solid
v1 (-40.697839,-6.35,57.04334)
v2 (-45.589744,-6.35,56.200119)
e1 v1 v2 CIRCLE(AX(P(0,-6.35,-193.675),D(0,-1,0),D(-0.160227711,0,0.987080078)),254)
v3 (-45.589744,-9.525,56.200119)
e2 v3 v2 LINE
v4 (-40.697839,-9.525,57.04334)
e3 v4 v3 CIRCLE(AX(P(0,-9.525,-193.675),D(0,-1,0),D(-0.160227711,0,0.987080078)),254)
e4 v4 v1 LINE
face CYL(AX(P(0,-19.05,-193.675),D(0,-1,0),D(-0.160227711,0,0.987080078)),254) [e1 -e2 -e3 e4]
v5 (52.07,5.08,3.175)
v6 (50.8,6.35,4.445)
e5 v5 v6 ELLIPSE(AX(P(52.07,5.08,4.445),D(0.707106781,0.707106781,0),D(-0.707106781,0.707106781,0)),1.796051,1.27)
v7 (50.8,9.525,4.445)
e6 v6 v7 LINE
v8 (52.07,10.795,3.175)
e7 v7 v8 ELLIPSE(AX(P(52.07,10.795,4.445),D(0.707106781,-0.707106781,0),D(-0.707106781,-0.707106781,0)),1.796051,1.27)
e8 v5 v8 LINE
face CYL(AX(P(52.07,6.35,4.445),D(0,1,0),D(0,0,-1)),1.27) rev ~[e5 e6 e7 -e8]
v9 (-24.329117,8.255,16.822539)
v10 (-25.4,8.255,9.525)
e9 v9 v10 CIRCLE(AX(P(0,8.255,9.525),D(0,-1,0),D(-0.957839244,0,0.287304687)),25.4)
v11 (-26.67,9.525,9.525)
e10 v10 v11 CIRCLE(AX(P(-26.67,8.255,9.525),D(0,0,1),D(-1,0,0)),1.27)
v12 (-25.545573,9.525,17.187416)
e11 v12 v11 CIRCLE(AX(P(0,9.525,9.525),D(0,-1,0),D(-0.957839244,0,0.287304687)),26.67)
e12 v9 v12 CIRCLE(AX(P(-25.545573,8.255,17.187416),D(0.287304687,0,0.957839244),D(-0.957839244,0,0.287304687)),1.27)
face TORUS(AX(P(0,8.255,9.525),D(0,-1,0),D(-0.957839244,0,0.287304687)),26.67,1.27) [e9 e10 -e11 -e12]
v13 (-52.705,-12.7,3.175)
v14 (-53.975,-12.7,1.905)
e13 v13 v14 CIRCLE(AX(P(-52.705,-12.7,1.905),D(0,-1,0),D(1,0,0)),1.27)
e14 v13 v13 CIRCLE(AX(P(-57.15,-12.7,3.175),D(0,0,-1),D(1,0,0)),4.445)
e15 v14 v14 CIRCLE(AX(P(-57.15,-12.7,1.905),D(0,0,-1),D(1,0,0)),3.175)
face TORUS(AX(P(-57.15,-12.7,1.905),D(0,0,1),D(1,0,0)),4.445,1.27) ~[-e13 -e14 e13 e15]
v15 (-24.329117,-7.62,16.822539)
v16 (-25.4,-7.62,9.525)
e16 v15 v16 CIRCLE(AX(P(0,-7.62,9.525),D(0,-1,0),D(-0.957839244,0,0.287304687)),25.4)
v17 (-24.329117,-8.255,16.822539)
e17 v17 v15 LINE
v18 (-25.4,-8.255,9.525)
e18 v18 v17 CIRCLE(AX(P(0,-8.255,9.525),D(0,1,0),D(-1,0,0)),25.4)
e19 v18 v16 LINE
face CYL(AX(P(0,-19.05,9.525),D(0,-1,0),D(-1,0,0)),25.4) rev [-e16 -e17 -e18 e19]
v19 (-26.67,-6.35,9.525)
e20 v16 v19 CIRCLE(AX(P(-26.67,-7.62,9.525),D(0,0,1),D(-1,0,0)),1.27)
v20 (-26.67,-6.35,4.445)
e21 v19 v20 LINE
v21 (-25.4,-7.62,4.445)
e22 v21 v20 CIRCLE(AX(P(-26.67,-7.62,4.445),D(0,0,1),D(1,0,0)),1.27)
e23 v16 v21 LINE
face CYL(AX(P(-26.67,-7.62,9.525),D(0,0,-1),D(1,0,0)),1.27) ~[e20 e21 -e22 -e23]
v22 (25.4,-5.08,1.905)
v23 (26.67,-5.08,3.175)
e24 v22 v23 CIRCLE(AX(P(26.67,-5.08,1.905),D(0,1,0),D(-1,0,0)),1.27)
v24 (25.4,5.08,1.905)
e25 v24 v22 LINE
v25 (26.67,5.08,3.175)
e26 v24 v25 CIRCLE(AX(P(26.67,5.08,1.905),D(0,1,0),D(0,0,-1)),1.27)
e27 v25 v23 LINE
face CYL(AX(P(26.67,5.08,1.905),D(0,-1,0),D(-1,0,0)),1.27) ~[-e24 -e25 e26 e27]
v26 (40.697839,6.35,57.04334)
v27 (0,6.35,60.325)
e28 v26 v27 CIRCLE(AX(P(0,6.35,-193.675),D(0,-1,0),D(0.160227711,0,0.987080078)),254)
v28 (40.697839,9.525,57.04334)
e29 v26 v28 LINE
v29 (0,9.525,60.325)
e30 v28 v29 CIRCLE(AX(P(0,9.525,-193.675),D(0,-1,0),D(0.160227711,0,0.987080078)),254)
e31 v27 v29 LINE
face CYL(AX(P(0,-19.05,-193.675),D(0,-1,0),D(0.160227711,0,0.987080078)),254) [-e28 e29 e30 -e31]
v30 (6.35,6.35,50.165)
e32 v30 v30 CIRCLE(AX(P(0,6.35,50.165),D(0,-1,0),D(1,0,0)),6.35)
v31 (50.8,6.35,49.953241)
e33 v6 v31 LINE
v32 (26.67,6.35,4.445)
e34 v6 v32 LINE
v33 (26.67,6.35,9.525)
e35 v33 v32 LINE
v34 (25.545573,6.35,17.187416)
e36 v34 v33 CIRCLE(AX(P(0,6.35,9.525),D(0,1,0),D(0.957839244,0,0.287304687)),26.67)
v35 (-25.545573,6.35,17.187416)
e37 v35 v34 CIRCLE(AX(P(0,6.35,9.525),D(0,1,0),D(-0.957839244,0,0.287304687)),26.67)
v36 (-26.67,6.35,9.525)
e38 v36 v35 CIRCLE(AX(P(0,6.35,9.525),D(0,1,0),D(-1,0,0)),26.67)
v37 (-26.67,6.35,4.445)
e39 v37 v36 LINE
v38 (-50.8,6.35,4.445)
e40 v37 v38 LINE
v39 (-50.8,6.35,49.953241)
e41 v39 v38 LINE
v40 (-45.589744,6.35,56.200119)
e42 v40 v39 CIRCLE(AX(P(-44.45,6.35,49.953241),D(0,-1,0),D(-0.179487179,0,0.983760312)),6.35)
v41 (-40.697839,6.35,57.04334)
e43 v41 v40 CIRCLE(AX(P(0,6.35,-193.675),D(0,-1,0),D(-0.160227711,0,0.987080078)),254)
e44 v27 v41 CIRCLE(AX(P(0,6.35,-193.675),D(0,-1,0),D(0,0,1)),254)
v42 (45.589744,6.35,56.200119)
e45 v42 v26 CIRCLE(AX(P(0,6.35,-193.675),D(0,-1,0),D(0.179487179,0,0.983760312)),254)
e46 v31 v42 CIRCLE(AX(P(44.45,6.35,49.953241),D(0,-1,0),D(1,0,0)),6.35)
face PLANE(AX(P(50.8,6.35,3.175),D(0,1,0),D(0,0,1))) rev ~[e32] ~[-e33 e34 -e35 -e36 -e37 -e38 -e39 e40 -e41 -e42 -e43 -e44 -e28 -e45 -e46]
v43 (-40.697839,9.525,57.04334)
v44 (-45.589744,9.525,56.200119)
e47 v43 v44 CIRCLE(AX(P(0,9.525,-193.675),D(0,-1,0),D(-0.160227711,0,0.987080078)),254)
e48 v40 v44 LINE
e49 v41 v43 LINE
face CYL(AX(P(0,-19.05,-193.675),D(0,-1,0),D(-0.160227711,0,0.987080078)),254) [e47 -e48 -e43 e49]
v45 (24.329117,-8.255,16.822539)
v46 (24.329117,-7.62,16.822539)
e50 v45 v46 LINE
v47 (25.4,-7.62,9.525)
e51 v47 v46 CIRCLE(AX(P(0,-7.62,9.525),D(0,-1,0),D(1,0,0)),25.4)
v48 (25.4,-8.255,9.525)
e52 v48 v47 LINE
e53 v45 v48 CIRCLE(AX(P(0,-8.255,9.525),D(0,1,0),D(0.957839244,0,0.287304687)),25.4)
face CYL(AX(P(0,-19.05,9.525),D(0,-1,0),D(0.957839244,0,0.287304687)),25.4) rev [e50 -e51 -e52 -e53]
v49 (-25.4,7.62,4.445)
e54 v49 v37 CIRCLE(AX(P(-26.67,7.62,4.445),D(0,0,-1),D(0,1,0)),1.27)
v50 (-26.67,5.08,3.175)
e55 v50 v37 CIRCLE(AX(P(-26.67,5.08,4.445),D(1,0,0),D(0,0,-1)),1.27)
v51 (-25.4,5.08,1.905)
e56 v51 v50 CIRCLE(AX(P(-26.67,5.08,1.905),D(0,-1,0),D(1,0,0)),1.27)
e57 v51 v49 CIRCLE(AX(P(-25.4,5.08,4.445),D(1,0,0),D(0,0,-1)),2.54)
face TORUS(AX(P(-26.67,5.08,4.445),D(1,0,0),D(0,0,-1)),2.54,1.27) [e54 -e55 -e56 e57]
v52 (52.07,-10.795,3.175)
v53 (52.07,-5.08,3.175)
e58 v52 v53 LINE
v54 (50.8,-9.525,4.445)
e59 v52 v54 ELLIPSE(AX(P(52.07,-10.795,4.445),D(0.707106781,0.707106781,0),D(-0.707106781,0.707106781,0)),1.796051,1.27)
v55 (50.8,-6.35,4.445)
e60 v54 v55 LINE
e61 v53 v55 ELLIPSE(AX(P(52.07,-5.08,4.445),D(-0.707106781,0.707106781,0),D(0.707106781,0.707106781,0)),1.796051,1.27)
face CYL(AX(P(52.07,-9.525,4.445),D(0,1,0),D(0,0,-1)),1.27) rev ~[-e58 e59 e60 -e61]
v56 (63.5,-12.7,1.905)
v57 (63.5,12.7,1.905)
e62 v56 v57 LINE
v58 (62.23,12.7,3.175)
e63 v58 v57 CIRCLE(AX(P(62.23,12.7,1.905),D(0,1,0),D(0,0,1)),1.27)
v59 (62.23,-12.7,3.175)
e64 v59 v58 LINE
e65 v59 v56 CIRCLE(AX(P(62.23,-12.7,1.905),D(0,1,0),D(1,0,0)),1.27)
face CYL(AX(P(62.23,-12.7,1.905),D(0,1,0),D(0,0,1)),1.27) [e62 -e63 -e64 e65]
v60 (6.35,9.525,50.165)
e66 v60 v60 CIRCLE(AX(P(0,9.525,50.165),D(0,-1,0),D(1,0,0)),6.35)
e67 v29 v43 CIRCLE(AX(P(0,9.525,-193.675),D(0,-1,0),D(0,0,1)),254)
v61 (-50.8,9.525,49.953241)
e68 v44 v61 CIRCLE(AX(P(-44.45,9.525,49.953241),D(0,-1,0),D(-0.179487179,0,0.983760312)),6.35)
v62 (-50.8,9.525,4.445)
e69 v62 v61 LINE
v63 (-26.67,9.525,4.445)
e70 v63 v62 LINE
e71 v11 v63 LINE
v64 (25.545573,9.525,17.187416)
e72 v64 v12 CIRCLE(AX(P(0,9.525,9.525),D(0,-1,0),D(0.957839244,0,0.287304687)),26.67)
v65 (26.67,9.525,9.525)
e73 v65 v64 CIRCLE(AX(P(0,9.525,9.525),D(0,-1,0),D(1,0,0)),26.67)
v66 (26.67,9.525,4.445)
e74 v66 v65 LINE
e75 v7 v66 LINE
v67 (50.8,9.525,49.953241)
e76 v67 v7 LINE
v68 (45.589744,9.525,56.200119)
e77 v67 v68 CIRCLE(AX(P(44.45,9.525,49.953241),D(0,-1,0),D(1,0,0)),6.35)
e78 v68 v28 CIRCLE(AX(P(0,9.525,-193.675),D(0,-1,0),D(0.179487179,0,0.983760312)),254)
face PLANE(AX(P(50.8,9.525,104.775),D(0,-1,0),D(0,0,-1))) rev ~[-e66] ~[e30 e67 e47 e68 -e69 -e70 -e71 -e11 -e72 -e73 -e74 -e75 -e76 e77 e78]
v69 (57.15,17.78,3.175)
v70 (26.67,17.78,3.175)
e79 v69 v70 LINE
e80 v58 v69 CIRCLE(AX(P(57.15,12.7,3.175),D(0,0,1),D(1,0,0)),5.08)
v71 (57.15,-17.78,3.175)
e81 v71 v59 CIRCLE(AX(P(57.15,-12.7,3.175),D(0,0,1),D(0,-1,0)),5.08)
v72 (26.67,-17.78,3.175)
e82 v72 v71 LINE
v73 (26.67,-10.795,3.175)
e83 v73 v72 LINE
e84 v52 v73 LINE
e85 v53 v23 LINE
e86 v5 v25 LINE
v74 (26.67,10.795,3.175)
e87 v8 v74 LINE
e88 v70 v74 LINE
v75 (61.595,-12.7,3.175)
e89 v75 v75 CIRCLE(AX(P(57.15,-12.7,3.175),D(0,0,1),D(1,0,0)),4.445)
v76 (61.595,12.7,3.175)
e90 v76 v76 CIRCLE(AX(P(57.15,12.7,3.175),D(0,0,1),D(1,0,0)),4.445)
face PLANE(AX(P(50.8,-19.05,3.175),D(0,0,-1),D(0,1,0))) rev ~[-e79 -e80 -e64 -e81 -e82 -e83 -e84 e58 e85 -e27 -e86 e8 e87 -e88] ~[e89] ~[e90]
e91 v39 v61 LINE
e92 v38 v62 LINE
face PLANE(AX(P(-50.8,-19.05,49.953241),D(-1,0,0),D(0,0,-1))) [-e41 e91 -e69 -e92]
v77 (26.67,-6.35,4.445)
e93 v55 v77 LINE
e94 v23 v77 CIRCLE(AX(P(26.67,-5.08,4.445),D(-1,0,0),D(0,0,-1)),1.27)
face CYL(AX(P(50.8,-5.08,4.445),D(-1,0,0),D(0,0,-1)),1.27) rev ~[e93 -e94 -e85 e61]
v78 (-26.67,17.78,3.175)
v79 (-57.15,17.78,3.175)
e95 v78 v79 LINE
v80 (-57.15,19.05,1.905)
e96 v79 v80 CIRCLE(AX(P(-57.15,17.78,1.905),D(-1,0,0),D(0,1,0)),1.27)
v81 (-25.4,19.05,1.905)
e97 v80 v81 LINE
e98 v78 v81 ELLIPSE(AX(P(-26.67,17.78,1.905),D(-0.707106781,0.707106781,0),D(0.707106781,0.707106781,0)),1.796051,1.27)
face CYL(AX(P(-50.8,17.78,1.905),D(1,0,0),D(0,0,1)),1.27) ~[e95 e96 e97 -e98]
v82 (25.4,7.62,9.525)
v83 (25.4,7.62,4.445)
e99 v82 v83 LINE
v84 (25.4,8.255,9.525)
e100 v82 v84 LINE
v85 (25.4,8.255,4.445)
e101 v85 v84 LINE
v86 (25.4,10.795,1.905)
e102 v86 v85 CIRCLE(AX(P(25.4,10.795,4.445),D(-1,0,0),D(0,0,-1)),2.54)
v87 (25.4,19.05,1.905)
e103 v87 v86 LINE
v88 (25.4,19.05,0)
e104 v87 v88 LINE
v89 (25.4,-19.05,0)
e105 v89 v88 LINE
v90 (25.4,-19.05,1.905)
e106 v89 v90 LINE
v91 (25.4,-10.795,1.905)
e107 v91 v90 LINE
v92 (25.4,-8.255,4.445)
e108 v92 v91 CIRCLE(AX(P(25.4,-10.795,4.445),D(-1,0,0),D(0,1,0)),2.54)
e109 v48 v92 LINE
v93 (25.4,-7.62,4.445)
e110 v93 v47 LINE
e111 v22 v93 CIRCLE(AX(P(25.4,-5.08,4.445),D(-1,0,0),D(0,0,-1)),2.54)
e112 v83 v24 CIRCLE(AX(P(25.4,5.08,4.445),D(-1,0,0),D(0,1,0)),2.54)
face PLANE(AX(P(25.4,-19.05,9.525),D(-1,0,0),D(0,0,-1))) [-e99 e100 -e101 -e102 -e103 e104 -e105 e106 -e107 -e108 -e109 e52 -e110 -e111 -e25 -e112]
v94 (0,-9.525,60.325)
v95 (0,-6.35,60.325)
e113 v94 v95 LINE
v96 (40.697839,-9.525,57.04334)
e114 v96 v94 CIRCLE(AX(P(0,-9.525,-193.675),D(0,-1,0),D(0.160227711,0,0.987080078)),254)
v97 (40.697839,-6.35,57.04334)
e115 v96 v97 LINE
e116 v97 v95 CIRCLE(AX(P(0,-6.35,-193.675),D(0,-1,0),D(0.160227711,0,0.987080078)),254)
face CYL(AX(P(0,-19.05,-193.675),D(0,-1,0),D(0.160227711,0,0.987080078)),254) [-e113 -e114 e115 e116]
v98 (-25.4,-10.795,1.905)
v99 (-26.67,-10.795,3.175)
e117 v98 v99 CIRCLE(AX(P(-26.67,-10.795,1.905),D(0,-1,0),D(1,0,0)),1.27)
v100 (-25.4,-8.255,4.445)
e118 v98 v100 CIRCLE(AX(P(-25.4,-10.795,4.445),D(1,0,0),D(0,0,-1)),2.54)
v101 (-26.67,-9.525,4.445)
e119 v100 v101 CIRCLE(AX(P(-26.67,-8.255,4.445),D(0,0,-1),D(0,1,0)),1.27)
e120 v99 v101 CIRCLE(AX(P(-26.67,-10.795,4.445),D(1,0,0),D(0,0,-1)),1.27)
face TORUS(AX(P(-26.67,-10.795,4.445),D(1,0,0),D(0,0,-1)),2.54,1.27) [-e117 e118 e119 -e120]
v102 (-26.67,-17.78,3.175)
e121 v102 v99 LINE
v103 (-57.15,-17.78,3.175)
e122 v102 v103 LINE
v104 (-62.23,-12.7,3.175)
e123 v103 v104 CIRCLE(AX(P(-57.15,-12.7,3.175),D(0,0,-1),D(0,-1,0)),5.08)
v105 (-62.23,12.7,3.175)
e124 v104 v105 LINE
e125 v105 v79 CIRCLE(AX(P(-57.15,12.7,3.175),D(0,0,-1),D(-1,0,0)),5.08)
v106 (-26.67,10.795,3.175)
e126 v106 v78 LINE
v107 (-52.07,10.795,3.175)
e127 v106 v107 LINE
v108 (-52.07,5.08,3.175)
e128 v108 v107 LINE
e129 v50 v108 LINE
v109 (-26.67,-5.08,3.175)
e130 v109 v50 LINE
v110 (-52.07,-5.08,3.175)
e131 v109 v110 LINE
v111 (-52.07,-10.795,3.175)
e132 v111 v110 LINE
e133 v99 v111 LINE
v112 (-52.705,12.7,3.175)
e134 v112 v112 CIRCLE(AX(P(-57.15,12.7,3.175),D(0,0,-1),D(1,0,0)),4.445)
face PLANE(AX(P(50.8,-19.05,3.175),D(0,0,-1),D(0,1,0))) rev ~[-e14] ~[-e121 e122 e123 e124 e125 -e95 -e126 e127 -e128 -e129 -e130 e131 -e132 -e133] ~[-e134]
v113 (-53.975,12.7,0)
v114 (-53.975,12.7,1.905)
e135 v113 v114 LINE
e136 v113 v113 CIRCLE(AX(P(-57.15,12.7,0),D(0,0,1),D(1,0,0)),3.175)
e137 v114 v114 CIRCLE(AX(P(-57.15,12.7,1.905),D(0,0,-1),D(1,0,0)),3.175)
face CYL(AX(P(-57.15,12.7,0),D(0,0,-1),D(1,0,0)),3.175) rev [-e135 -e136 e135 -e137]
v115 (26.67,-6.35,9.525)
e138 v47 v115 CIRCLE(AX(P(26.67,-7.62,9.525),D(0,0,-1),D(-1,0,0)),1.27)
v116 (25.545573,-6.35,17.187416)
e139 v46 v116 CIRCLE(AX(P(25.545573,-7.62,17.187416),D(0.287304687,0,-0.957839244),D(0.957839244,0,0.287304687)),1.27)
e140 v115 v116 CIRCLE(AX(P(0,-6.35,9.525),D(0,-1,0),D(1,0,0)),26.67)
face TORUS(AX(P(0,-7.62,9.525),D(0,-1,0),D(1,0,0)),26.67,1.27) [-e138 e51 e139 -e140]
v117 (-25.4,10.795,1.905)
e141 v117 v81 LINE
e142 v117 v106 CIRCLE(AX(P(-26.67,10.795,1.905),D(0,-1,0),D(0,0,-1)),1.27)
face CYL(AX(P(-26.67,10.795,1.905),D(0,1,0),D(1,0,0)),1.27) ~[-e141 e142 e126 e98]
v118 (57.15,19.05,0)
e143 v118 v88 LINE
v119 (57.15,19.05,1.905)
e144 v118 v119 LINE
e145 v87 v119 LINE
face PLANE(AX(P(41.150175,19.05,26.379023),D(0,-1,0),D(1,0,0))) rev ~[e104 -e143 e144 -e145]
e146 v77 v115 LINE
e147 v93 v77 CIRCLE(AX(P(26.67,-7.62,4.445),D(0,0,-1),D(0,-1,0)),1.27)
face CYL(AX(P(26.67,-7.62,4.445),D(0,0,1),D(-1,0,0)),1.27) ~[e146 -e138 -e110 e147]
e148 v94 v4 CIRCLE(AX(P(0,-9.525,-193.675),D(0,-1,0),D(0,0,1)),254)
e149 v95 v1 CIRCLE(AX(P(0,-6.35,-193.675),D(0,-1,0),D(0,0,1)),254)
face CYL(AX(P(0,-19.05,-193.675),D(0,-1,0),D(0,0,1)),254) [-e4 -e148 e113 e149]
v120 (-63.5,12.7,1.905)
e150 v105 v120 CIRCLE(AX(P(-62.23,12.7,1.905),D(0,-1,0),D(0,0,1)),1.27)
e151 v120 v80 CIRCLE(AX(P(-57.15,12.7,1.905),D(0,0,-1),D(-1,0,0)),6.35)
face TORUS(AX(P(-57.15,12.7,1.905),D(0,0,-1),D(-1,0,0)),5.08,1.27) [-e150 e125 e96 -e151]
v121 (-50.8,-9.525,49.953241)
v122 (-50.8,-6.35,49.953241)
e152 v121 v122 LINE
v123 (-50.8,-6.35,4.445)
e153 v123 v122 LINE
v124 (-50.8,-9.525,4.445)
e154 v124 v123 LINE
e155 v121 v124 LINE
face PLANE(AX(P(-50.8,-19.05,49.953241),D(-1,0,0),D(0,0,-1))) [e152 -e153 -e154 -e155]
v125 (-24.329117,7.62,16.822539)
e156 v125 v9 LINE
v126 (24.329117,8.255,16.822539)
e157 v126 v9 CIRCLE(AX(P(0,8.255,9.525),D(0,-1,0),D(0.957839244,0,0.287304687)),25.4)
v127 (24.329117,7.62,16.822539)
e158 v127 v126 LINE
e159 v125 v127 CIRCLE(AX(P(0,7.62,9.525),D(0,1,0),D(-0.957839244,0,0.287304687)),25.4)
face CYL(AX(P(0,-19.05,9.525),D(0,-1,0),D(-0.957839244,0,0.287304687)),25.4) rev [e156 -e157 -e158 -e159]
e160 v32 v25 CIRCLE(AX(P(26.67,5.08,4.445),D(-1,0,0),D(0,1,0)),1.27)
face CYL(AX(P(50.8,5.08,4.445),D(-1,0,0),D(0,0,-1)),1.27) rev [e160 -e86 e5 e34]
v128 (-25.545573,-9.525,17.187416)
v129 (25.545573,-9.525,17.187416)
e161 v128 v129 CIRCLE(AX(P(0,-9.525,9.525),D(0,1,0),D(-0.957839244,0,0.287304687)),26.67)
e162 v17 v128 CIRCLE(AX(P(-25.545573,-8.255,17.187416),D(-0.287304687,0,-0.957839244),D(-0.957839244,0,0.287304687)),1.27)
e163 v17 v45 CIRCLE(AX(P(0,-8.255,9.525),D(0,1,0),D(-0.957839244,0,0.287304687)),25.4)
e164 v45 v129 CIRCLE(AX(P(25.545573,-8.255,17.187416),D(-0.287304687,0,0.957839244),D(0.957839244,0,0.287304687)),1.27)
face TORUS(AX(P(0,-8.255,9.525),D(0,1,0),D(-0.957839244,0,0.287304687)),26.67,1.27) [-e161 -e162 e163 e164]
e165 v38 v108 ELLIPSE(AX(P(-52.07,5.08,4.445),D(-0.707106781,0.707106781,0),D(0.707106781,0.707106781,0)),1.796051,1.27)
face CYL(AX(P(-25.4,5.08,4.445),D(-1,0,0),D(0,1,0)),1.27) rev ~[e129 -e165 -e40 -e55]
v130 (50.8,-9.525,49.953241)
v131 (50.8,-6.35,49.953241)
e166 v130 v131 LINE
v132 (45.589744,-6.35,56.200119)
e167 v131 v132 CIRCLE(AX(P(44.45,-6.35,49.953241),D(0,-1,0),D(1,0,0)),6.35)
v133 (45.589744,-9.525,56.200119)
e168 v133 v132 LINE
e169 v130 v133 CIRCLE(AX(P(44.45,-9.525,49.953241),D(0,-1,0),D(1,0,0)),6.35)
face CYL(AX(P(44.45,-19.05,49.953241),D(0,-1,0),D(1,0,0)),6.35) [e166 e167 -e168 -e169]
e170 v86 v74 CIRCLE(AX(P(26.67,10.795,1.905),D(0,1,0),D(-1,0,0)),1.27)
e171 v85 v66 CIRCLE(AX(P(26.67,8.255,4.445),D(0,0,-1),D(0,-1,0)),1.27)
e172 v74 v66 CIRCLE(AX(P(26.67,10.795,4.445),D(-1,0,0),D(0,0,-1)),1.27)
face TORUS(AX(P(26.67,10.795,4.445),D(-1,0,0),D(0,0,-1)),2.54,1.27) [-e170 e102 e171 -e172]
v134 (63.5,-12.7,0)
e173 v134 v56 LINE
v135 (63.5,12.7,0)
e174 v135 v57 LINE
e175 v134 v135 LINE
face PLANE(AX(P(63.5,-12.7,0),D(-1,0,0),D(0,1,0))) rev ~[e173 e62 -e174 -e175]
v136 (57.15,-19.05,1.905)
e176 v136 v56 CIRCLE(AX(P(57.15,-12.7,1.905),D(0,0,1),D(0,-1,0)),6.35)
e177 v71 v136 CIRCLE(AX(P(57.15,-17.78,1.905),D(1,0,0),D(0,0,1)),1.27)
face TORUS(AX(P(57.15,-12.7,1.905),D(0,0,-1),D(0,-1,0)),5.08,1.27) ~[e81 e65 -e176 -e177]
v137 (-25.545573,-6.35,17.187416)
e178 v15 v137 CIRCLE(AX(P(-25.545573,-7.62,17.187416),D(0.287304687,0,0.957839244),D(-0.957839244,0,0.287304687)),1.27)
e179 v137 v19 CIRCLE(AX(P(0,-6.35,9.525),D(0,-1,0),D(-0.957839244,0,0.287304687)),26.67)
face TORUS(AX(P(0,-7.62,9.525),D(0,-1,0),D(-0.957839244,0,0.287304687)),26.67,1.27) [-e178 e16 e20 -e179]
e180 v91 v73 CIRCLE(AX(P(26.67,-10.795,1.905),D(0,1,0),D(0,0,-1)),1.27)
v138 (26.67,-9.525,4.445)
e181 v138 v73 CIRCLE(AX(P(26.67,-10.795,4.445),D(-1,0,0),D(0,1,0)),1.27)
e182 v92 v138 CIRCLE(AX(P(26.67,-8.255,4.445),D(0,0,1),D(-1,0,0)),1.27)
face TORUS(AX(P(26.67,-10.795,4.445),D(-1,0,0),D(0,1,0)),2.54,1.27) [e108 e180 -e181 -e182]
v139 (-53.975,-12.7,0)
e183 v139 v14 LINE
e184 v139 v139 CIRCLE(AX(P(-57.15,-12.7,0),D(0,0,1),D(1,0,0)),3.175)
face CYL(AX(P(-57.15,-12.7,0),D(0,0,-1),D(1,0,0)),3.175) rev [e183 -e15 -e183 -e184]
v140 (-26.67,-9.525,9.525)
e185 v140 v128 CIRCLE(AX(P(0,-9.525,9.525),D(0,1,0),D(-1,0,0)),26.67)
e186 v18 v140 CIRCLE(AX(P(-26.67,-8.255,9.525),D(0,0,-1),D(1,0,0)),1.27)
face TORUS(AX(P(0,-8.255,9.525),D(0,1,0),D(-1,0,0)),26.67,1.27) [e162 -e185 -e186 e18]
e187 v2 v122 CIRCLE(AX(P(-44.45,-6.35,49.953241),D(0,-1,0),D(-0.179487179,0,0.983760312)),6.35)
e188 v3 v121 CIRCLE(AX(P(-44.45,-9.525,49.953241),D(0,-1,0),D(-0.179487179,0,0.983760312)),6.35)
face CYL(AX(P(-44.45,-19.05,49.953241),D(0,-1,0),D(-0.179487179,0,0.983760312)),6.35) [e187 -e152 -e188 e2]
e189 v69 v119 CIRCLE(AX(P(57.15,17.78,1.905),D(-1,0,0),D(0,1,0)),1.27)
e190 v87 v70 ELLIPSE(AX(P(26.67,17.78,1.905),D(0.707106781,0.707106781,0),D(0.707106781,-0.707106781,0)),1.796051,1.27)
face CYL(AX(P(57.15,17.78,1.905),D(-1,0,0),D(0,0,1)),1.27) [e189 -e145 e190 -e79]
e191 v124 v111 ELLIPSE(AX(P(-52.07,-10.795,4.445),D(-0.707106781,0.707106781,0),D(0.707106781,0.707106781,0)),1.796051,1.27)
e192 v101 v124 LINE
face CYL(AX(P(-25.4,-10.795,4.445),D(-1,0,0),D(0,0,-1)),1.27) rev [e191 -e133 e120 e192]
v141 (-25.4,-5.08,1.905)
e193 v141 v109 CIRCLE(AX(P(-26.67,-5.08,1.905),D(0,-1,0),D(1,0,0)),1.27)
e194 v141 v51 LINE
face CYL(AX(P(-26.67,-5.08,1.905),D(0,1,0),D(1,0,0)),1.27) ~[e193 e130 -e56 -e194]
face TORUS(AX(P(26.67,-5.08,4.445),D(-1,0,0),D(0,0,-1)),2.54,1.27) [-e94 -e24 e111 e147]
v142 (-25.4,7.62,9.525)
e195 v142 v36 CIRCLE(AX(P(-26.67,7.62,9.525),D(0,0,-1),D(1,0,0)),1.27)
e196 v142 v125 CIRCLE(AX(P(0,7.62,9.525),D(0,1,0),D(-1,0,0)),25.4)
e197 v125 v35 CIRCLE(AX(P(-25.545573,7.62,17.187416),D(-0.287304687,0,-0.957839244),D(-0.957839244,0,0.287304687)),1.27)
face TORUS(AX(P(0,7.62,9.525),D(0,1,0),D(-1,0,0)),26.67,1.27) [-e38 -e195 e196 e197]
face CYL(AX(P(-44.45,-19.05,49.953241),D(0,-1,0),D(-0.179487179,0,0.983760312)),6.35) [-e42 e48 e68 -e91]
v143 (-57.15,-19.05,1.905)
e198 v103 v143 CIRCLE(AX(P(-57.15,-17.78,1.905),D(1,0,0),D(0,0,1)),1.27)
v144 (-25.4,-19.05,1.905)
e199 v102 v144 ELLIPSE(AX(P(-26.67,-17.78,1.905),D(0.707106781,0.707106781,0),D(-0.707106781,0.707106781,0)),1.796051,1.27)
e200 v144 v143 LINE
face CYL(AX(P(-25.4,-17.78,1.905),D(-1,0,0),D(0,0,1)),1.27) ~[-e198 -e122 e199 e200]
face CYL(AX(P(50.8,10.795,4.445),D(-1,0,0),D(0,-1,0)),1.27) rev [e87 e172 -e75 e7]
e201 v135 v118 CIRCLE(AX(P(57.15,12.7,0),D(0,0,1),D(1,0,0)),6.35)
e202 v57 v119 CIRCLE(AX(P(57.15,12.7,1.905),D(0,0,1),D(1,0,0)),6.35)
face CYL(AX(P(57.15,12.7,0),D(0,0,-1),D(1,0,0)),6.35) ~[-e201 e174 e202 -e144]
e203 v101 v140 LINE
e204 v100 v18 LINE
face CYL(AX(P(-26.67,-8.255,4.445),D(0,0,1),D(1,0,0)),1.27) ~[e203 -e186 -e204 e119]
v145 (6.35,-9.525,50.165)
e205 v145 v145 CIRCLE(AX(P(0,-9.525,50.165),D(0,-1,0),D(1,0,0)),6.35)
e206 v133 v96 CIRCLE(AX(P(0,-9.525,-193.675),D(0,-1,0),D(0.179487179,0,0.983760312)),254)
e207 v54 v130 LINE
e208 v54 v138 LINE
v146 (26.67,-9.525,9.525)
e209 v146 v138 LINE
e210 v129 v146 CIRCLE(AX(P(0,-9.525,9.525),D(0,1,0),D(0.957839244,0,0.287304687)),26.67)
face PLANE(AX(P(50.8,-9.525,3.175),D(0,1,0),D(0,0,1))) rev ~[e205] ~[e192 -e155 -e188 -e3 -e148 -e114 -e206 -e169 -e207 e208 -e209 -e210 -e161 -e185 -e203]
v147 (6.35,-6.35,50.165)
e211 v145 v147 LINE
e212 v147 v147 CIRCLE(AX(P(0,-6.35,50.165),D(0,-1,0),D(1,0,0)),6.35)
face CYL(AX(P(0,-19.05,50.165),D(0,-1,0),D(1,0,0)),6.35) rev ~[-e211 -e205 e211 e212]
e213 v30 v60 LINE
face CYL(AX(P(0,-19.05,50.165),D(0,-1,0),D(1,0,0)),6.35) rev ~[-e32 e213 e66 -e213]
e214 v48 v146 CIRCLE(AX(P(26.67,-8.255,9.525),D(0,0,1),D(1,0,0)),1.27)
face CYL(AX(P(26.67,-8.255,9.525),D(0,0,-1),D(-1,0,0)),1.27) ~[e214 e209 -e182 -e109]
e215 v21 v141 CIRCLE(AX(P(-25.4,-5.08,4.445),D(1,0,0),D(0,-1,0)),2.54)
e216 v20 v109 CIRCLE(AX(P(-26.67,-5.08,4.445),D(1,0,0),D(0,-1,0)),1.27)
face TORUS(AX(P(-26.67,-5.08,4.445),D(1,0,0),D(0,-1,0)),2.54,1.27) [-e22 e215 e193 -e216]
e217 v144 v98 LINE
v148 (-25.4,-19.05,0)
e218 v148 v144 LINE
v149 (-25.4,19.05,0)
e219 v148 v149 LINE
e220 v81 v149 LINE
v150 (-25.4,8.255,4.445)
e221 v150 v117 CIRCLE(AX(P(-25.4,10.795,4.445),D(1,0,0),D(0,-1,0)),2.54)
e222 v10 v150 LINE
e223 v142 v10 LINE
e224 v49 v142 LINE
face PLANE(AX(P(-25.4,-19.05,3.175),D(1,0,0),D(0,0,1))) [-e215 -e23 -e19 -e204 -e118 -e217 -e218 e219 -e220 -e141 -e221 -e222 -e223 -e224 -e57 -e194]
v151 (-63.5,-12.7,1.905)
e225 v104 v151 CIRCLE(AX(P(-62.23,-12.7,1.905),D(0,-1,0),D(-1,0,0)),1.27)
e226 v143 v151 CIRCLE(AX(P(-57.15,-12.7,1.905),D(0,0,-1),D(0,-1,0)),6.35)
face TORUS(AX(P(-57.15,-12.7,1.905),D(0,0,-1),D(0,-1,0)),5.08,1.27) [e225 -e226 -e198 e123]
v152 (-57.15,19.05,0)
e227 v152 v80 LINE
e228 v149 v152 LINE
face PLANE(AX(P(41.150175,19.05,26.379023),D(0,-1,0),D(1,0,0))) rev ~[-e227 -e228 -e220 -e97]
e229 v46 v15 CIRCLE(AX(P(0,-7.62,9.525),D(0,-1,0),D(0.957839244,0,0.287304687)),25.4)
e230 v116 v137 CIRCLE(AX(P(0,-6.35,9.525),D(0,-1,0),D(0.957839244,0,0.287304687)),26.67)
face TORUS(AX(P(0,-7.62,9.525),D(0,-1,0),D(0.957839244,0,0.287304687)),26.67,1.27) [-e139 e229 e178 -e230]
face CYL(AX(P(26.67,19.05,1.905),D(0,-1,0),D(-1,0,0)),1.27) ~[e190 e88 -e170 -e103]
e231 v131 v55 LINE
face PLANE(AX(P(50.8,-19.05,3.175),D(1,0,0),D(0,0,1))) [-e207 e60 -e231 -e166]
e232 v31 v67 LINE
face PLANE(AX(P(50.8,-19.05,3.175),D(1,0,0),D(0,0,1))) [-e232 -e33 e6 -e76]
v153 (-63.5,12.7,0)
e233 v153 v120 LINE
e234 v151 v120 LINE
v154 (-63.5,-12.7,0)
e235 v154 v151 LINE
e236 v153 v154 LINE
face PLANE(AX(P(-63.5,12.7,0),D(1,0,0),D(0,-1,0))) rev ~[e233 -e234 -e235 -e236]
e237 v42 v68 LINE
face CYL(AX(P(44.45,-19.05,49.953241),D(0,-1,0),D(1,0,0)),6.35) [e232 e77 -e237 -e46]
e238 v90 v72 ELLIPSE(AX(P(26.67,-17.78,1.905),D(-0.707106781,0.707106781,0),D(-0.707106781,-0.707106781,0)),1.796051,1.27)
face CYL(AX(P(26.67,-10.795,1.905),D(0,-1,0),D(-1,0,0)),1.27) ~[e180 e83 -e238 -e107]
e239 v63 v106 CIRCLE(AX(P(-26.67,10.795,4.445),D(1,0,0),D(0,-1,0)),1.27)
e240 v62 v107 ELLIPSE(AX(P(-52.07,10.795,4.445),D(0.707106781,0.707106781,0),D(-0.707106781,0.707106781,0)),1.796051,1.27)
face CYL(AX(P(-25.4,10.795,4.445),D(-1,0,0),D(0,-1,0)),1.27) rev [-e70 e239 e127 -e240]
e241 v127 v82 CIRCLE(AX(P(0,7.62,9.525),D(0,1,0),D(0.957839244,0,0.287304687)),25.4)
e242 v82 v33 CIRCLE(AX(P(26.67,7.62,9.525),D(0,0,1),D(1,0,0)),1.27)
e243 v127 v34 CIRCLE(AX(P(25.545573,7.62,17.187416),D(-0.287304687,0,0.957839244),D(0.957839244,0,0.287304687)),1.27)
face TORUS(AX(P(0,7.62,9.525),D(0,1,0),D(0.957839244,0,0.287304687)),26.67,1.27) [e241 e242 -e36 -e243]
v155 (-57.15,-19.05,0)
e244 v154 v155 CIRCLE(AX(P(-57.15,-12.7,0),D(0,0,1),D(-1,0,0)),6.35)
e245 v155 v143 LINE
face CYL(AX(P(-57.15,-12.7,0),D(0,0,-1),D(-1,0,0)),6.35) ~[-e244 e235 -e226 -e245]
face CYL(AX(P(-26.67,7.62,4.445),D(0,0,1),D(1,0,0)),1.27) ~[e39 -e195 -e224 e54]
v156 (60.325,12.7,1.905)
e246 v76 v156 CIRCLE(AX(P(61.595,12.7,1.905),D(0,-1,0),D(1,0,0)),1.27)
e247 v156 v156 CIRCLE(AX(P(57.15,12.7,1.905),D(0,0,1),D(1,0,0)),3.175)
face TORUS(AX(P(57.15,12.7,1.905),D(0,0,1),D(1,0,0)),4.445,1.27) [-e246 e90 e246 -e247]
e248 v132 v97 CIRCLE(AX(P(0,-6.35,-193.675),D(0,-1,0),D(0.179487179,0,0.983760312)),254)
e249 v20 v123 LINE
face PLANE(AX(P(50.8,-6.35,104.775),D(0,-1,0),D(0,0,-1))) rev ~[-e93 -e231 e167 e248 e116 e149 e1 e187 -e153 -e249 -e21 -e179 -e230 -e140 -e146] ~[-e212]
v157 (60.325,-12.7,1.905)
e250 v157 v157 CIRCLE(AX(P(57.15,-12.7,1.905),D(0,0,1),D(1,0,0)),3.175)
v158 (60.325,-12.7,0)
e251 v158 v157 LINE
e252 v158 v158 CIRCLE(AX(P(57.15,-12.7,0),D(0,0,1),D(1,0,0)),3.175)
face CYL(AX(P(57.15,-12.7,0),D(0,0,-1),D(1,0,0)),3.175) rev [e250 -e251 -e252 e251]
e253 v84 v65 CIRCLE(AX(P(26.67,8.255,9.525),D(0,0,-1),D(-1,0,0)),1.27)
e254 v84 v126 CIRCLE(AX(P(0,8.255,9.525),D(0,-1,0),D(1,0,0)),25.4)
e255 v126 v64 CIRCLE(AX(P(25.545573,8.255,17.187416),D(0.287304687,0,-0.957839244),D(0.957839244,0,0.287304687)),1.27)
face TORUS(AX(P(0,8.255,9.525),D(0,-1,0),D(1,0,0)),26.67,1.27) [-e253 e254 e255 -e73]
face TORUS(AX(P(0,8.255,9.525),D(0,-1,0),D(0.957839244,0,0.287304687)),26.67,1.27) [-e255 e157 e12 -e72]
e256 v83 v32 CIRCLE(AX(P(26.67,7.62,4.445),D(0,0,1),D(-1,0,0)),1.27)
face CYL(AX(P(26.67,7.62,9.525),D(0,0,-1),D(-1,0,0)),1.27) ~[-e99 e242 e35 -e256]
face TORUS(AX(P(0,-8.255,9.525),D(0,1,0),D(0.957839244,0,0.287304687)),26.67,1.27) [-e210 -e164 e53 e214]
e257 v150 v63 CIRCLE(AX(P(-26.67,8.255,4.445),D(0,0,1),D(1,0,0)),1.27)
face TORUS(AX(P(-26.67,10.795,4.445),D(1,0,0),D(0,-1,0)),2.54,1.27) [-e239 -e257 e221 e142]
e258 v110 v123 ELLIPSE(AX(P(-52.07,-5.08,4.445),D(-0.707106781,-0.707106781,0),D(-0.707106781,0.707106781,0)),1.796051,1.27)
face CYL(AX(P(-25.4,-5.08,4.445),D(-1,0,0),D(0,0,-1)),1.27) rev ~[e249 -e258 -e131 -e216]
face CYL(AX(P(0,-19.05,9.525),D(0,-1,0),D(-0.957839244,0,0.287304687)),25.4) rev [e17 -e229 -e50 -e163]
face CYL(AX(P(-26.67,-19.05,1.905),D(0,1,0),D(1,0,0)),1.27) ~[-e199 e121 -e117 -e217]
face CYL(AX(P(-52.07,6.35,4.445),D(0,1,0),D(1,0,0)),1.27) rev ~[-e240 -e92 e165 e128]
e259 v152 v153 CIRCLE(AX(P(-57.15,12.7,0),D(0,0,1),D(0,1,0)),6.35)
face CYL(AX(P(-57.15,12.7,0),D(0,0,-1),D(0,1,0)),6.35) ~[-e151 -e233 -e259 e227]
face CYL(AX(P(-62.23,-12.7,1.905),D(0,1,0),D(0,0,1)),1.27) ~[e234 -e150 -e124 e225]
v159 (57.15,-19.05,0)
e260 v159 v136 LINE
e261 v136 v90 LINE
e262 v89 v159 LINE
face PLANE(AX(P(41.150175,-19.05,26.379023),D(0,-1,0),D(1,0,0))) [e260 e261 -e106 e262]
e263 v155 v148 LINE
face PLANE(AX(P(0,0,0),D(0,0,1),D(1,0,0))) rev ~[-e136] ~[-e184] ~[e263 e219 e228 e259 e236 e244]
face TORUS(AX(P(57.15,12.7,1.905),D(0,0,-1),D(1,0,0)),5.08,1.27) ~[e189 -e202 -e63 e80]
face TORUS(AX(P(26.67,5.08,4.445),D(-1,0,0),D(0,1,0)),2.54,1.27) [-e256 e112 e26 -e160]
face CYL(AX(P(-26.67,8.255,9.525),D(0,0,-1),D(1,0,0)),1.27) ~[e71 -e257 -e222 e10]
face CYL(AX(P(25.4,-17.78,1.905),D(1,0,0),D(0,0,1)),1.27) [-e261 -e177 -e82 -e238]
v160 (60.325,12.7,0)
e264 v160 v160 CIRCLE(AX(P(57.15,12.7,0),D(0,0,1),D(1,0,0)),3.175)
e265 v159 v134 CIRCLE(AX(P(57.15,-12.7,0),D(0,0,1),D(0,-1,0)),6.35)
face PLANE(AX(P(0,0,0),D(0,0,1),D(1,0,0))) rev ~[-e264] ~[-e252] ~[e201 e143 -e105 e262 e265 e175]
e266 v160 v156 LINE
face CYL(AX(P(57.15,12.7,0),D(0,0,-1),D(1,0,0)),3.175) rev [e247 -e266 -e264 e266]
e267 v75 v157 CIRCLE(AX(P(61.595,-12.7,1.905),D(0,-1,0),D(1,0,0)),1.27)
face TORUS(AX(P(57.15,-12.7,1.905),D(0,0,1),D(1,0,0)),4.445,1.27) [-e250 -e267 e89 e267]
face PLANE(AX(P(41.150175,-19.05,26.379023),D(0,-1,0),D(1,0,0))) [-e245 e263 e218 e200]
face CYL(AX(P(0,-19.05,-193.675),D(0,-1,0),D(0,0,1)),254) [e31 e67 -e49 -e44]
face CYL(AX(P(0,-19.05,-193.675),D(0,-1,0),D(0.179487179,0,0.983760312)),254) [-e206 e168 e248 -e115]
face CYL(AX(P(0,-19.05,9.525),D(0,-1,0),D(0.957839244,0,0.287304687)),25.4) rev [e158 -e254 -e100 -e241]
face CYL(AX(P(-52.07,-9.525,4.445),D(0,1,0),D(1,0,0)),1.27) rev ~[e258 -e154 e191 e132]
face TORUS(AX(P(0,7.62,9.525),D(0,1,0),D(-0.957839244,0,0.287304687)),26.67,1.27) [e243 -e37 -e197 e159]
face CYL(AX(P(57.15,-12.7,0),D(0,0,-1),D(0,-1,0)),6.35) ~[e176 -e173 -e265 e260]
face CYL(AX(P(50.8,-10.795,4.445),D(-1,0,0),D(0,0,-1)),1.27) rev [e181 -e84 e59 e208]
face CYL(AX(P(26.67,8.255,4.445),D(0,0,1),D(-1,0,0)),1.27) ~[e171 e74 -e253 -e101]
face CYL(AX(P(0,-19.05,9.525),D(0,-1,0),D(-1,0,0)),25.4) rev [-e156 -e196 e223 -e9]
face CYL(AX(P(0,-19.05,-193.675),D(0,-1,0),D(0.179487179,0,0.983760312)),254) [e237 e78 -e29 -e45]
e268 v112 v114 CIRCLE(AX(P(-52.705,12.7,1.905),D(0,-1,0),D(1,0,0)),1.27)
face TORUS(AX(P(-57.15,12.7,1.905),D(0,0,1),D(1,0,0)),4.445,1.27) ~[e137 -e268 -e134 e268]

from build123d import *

# Parameters (mm, degrees)
F0_R     = 3.175
F1_DEPTH = 3.175
F2_W     = 50.8
F2_H     = 38.1
F3_DEPTH = 3.176
F4_R     = 6.35
F5_DEPTH = 38.1
F6_W     = 9.525
F6_H     = 46.7782413843
F6_H_2   = 54.8217586157
F6_W_2   = 12.7
F7_DEPTH = 114.301
F8_F1_R  = 1.27
F8_F2_R  = 1.27


with BuildPart() as f1:
    # F0 (on Top) → F1 (new body)
    with BuildSketch(Plane.XY):
        with BuildLine():
            Line((57.15, 19.05), (-57.15, 19.05))
            ThreePointArc((-57.15, 19.05), (-61.6401280605, 17.1901280605), (-63.5, 12.7))
            Line((-63.5, 12.7), (-63.5, -12.7))
            ThreePointArc((-63.5, -12.7), (-61.6401280605, -17.1901280605), (-57.15, -19.05))
            Line((-57.15, -19.05), (57.15, -19.05))
            ThreePointArc((57.15, -19.05), (61.6401280605, -17.1901280605), (63.5, -12.7))
            Line((63.5, -12.7), (63.5, 12.7))
            ThreePointArc((63.5, 12.7), (61.6401280605, 17.1901280605), (57.15, 19.05))
        make_face()
        with Locations((-57.15, -12.7)):
            Circle(F0_R, mode=Mode.SUBTRACT)
        with Locations((57.15, -12.7)):
            Circle(F0_R, mode=Mode.SUBTRACT)
        with Locations((-57.15, 12.7)):
            Circle(F0_R, mode=Mode.SUBTRACT)
        with Locations((57.15, 12.7)):
            Circle(F0_R, mode=Mode.SUBTRACT)
    extrude(amount=F1_DEPTH)

    # F2 (on face) → F3 (cut, through all)
    with BuildSketch(Plane.XY.offset(3.175)):
        Rectangle(F2_W, F2_H)
    extrude(amount=-F3_DEPTH, mode=Mode.SUBTRACT)

    # F4 (on face) → F5 (join, through all)
    with BuildSketch(Plane.XZ.offset(19.05)):
        with BuildLine():
            ThreePointArc((24.3291167869, 16.8225390625), (25.1308532126, 13.2128471777), (25.4, 9.525))
            Line((25.4, 9.525), (25.4, 3.175))
            Line((25.4, 3.175), (50.8, 3.175))
            Line((50.8, 3.175), (50.8, 49.9532413843))
            ThreePointArc((50.8, 49.9532413843), (49.3264675635, 54.0204964909), (45.5897435897, 56.2001193685))
            ThreePointArc((45.5897435897, 56.2001193685), (43.1458510734, 56.633680503), (40.6978385912, 57.0433398438))
            ThreePointArc((40.6978385912, 57.0433398437), (41.130456555, 53.6162560865), (41.275, 50.165))
            ThreePointArc((41.275, 50.165), (36.7954475471, 31.4641801033), (24.3291167869, 16.8225390625))
        make_face()
        with BuildLine():
            ThreePointArc((0, 60.325), (-20.414966075, 59.5032557017), (-40.6978385912, 57.0433398438))
            ThreePointArc((-40.6978385912, 57.0433398437), (-38.2302816535, 34.6063628588), (-24.3291167869, 16.8225390625))
            ThreePointArc((-24.3291167869, 16.8225390625), (0, 34.925), (24.3291167869, 16.8225390625))
            ThreePointArc((24.3291167869, 16.8225390625), (36.7954475471, 31.4641801033), (41.275, 50.165))
            ThreePointArc((41.275, 50.165), (41.130456555, 53.6162560865), (40.6978385912, 57.0433398437))
            ThreePointArc((40.6978385912, 57.0433398438), (20.414966075, 59.5032557017), (0, 60.325))
        make_face()
        with Locations((0, 50.165)):
            Circle(F4_R, mode=Mode.SUBTRACT)
        with BuildLine():
            Line((-50.8, 49.9532413843), (-50.8, 3.175))
            Line((-50.8, 3.175), (-25.4, 3.175))
            Line((-25.4, 3.175), (-25.4, 9.525))
            ThreePointArc((-25.4, 9.525), (-25.1308532126, 13.2128471777), (-24.3291167869, 16.8225390625))
            ThreePointArc((-24.3291167869, 16.8225390625), (-38.2302816535, 34.6063628588), (-40.6978385912, 57.0433398437))
            ThreePointArc((-40.6978385912, 57.0433398438), (-43.1458510734, 56.633680503), (-45.5897435897, 56.2001193685))
            ThreePointArc((-45.5897435897, 56.2001193685), (-49.3264675635, 54.0204964909), (-50.8, 49.9532413843))
        make_face()
    extrude(amount=-F5_DEPTH)

    # F6 (on face) → F7 (cut, through all)
    with BuildSketch(Plane.YZ.offset(50.8)):
        with Locations((-14.2875, 26.5641206921)):
            Rectangle(F6_W, F6_H)
        with Locations((-14.2875, 77.3641206921)):
            Rectangle(F6_W, F6_H_2)
        with Locations((14.2875, 26.5641206921)):
            Rectangle(F6_W, F6_H)
        with Locations((14.2875, 77.3641206921)):
            Rectangle(F6_W, F6_H_2)
        with Locations((0, 26.5641206921)):
            Rectangle(F6_W_2, F6_H)
        with Locations((0, 77.3641206921)):
            Rectangle(F6_W_2, F6_H_2)
    extrude(amount=-F7_DEPTH, mode=Mode.SUBTRACT)

    # F8: fillet of radius 1.27 on 32 edges, made by hand

    # F8_f1
    f8_f1_edges = [f1.edges().sort_by_distance(p)[0] for p in [
        (-38.1, 9.525, 3.175),
        (-50.8, 7.9375, 3.175),
        (-38.1, 6.35, 3.175),
        (-38.1, -6.35, 3.175),
        (-50.8, -7.9375, 3.175),
        (-38.1, -9.525, 3.175),
        (38.1, 9.525, 3.175),
        (38.1, -9.525, 3.175),
        (50.8, -7.9375, 3.175),
        (38.1, -6.35, 3.175),
        (38.1, 6.35, 3.175),
        (50.8, 7.9375, 3.175),
    ]]
    fillet(f8_f1_edges, radius=F8_F1_R)

    # F8_f2
    f8_f2_edges = [f1.edges().sort_by_distance(p)[0] for p in [
        (-41.275, -19.05, 3.175),
        (-61.6401280605, -17.1901280605, 3.175),
        (-63.5, 0, 3.175),
        (-61.6401280605, 17.1901280605, 3.175),
        (-41.275, 19.05, 3.175),
        (-25.4, 14.9225, 3.175),
        (-25.4, 0, 3.175),
        (-25.4, -14.9225, 3.175),
        (-60.325, -12.7, 3.175),
        (-60.325, 12.7, 3.175),
        (25.4, 14.9225, 3.175),
        (41.275, 19.05, 3.175),
        (61.6401280605, 17.1901280605, 3.175),
        (63.5, 0, 3.175),
        (61.6401280605, -17.1901280605, 3.175),
        (41.275, -19.05, 3.175),
        (25.4, -14.9225, 3.175),
        (25.4, 0, 3.175),
        (53.975, 12.7, 3.175),
        (53.975, -12.7, 3.175),
        (25.4, -5.9780256121, 3.5469743879),
        (25.4, 5.9780256121, 3.5469743879),
        (25.4, -9.8969743879, 3.5469743879),
        (25.4, 9.8969743879, 3.5469743879),
        (-25.4, -9.8969743879, 3.5469743879),
        (-25.4, -5.9780256121, 3.5469743879),
        (-25.4, 5.9780256121, 3.5469743879),
        (-25.4, 9.8969743879, 3.5469743879),
    ]]
    fillet(f8_f2_edges, radius=F8_F2_R)


solid = f1.part
